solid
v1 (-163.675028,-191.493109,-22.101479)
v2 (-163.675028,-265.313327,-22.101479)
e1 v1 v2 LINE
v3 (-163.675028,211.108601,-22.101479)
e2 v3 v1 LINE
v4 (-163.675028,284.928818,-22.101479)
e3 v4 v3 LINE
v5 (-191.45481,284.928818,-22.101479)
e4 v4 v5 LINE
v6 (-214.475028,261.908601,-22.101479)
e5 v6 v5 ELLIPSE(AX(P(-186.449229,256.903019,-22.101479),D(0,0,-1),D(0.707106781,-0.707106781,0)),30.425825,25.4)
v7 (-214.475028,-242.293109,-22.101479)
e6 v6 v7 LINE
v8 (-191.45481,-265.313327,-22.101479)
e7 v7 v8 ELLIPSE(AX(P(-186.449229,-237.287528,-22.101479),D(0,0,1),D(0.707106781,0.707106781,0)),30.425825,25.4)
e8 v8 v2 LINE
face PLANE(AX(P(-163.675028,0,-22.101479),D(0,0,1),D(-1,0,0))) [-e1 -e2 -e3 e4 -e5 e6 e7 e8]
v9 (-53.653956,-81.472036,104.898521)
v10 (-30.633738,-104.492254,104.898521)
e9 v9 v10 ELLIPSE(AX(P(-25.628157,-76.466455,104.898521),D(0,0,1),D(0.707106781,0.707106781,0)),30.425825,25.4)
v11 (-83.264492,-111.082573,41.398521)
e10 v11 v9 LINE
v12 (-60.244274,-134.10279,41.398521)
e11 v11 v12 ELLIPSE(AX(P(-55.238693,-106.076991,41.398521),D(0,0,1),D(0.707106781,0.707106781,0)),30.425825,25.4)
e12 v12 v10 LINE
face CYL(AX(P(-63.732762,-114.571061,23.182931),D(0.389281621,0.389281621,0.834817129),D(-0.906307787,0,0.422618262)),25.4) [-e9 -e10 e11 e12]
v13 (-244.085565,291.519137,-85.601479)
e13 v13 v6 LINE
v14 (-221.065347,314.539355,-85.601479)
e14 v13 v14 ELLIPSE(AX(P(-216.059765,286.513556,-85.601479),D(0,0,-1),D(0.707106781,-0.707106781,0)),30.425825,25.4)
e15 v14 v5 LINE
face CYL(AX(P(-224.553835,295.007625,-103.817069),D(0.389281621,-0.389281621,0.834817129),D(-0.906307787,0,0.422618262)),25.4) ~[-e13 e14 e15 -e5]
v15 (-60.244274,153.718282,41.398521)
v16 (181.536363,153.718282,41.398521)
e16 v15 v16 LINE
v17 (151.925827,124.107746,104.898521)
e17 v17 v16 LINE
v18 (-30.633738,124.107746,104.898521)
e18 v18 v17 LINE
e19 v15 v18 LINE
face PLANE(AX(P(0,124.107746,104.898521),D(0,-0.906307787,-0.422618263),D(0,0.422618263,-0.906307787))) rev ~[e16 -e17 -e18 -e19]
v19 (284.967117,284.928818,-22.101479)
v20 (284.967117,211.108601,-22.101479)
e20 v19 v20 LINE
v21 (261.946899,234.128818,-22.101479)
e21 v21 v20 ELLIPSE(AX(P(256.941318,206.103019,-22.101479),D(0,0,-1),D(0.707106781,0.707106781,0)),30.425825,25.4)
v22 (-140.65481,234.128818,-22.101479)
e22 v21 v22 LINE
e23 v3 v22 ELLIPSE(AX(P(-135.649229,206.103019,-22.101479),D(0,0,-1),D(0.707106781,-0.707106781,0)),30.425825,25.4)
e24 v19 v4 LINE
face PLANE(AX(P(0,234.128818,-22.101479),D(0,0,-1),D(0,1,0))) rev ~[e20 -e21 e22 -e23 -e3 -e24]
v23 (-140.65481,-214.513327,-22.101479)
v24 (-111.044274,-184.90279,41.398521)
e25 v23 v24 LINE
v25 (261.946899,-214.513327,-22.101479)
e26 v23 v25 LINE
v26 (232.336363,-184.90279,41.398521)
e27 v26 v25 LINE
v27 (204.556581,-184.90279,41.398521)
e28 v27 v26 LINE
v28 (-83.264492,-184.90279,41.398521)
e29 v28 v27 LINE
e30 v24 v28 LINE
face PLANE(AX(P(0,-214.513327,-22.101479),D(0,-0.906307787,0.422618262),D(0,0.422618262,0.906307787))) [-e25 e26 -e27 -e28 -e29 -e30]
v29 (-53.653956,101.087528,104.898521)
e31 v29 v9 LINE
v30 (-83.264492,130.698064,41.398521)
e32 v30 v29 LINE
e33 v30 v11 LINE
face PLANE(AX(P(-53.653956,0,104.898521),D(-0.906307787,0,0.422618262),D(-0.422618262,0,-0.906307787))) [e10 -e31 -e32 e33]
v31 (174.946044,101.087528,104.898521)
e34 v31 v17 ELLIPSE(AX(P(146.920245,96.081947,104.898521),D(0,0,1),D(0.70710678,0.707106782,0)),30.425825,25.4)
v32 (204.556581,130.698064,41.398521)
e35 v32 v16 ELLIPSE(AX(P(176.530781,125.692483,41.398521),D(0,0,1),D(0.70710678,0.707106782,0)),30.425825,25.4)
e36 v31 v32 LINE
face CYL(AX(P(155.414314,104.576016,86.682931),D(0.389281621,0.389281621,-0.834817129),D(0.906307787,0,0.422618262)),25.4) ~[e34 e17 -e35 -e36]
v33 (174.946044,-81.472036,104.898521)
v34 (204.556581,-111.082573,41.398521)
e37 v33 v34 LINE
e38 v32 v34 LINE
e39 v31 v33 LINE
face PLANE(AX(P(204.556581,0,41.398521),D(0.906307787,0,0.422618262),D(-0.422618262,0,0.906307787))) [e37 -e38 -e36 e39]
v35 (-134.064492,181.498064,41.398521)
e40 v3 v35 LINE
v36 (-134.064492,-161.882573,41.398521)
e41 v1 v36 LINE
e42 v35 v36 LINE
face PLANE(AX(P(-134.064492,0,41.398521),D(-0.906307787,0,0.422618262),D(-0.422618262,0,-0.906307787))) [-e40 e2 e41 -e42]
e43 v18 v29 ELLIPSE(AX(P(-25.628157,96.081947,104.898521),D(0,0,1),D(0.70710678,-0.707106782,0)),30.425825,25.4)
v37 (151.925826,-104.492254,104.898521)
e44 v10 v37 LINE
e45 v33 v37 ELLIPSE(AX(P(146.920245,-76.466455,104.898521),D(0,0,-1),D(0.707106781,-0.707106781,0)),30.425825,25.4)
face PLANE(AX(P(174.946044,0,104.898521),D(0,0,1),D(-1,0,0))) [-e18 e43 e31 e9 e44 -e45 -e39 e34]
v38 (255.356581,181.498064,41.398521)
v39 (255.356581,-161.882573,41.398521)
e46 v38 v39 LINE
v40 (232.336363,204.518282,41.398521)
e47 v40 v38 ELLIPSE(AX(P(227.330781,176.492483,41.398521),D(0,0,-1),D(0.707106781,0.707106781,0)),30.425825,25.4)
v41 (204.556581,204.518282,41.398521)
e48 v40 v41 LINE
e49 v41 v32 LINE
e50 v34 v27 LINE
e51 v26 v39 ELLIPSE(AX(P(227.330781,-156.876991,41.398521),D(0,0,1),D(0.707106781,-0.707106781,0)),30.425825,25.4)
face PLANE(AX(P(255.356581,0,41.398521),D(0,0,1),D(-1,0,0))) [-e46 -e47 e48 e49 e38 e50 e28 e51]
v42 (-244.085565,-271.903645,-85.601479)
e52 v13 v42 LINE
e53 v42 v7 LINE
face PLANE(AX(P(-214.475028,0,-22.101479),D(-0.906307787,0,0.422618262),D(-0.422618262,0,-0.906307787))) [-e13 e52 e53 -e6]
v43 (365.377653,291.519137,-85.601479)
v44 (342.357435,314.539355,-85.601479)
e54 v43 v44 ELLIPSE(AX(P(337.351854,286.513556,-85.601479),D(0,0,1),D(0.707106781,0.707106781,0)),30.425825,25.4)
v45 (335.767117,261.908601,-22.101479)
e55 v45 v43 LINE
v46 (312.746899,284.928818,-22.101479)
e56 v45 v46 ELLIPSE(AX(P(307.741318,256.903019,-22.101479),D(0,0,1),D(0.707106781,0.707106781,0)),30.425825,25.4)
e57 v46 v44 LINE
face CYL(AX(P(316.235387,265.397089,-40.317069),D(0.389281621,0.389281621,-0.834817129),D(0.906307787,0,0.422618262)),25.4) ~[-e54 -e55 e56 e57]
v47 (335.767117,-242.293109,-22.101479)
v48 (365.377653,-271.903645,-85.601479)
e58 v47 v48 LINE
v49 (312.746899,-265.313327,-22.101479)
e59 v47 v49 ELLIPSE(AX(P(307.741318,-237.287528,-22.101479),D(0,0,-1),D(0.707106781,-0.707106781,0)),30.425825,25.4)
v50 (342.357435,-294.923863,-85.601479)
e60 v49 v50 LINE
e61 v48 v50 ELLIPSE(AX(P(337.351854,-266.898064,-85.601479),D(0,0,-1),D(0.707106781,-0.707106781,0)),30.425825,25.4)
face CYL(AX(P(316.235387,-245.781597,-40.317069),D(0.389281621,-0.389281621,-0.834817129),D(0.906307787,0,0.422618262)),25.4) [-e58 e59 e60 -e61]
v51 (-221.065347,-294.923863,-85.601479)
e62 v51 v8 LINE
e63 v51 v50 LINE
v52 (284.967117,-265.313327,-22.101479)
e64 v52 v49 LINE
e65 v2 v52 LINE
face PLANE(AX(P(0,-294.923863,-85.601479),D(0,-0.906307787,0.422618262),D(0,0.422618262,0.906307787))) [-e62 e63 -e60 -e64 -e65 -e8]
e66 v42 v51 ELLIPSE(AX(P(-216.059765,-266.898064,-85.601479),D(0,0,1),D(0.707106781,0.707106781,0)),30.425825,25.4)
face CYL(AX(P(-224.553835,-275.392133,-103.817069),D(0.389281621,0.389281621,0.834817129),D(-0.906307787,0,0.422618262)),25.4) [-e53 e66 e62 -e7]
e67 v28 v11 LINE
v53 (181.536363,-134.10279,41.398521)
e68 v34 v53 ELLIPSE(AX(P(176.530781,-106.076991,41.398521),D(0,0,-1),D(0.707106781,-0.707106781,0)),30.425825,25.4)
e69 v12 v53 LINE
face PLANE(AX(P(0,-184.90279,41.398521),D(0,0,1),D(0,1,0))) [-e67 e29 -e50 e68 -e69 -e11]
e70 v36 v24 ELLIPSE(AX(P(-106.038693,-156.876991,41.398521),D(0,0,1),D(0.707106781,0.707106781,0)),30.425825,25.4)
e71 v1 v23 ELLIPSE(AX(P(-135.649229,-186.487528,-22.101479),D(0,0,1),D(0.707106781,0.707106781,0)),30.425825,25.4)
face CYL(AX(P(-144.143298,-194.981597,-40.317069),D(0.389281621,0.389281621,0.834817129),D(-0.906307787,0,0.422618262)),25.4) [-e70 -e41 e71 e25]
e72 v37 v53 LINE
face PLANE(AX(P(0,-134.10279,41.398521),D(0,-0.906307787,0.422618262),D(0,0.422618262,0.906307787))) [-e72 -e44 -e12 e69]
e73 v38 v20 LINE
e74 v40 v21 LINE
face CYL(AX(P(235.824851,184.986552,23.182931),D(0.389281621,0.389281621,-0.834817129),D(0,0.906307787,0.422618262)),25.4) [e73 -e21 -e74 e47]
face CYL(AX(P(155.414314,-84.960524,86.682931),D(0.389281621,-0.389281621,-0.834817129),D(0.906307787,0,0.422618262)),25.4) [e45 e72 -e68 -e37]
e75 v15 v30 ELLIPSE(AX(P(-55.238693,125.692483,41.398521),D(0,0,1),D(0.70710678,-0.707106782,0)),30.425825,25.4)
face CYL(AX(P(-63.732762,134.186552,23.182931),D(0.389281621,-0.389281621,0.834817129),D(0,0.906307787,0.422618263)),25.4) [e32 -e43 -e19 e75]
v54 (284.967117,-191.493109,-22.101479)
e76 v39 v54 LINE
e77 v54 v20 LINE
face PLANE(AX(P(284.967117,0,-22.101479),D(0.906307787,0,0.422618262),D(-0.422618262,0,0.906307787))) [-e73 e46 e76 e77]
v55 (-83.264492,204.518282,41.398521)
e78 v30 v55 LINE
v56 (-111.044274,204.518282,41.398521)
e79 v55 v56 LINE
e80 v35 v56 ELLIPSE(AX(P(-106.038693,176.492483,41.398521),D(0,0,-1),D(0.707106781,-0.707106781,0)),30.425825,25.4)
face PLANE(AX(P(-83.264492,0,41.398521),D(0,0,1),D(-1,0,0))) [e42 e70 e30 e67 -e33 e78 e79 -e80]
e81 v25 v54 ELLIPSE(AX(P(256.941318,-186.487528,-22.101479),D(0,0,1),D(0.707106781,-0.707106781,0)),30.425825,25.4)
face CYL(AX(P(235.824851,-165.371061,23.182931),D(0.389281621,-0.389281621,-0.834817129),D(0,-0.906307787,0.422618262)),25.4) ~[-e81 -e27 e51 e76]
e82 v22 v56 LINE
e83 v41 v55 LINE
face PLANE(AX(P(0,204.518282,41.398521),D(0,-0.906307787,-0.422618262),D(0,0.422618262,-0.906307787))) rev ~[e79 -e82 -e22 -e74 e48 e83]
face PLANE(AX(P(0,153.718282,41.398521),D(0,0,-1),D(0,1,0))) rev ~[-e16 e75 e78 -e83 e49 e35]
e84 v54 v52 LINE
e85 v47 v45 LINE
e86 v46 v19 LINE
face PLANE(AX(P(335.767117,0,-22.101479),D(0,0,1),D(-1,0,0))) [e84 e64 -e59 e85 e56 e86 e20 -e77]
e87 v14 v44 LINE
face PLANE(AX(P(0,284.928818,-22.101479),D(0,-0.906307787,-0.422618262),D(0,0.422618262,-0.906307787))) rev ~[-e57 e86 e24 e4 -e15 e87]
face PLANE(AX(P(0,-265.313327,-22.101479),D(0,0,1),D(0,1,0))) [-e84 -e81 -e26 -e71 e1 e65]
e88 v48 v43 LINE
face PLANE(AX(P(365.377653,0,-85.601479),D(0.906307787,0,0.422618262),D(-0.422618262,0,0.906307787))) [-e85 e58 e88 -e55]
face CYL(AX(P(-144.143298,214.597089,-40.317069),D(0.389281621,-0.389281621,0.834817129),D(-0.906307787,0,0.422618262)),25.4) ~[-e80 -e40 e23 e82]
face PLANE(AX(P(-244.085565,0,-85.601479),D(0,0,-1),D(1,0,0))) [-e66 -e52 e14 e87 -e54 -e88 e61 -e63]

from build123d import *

# Parameters (mm, degrees)
F1_DEPTH = 487.68
F3_DEPTH = 543.56
F4_R     = 25.4


# Not quite as in the source:
# - ends of sketch curves that miss each other by under 0.0002 mm in the source are joined


with BuildPart() as f1:
    # F0 (on Front) → F1 (new body, symmetric)
    with BuildSketch(Plane.XZ):
        Polygon((-83.2644920098, 41.3985210439), (60.6460442831, 41.3985210439), (60.6460442831, 104.8985210439), (-53.6539557169, 104.8985210439), align=None)
        Polygon((60.6460442831, 104.8985210439), (60.6460442831, 41.3985210439), (204.5565805759, 41.3985210439), (174.9460442831, 104.8985210439), align=None)
        Polygon((60.6460442831, 41.3985210439), (60.6460442831, -22.1014789561), (284.9671168688, -22.1014789561), (255.3565805759, 41.3985210439), (204.5565805759, 41.3985210439), align=None)
        Polygon((-163.6750283026, -22.1014789561), (60.6460442831, -22.1014789561), (60.6460442831, 41.3985210439), (-83.2644920098, 41.3985210439), (-134.0644920098, 41.3985210439), align=None)
        Polygon((-244.0855645955, -85.6014789561), (60.6460442831, -85.6014789561), (60.6460442831, -22.1014789561), (-163.6750283026, -22.1014789561), (-214.4750283026, -22.1014789561), align=None)
        Polygon((60.6460442831, -22.1014789561), (60.6460442831, -85.6014789561), (365.3776531616, -85.6014789561), (335.7671168688, -22.1014789561), (284.9671168688, -22.1014789561), align=None)
    extrude(amount=F1_DEPTH, both=True)

    # F2 (on Right) → F3 (cut, symmetric)
    with BuildSketch(Plane.YZ):
        Polygon((-396.5238630772, -85.6014788151), (-294.9238630772, -85.6014788151), (-265.3133267843, -22.1014788151), (-214.5133267843, -22.1014788151), (-184.9027904915, 41.3985211849), (-134.1027904915, 41.3985211849), (-104.4922541986, 104.8985211849), (-180.6922541986, 104.8985211849), (-487.68, 104.8985210439), (-487.68, -85.6014789561), align=None)
        Polygon((284.928818387, -22.1014788151), (314.5393546799, -85.6014788151), (487.68, -85.6014789561), (487.68, 104.8985210439), (124.1077458014, 104.8985210439), (153.7182820942, 41.3985211849), (204.5182820942, 41.3985211849), (234.128818387, -22.1014788151), align=None)
    extrude(amount=F3_DEPTH, both=True, mode=Mode.SUBTRACT)

    # F4
    f4_edges = [f1.edges().sort_by_distance(p)[0] for p in [
        (-68.459224, 138.913014, 73.148521),
        (-148.86976, 219.32355, 9.648521),
        (-229.280296, 299.734087, -53.851479),
        (350.572385, 299.734087, -53.851479),
        (270.161849, 219.32355, 9.648521),
        (189.751312, 138.913014, 73.148521),
        (350.572385, -280.118595, -53.851479),
        (270.161849, -199.708059, 9.648521),
        (189.751312, -119.297522, 73.148521),
        (-229.280296, -280.118595, -53.851479),
        (-148.86976, -199.708059, 9.648521),
        (-68.459224, -119.297522, 73.148521),
    ]]
    fillet(f4_edges, radius=F4_R)


solid = f1.part
